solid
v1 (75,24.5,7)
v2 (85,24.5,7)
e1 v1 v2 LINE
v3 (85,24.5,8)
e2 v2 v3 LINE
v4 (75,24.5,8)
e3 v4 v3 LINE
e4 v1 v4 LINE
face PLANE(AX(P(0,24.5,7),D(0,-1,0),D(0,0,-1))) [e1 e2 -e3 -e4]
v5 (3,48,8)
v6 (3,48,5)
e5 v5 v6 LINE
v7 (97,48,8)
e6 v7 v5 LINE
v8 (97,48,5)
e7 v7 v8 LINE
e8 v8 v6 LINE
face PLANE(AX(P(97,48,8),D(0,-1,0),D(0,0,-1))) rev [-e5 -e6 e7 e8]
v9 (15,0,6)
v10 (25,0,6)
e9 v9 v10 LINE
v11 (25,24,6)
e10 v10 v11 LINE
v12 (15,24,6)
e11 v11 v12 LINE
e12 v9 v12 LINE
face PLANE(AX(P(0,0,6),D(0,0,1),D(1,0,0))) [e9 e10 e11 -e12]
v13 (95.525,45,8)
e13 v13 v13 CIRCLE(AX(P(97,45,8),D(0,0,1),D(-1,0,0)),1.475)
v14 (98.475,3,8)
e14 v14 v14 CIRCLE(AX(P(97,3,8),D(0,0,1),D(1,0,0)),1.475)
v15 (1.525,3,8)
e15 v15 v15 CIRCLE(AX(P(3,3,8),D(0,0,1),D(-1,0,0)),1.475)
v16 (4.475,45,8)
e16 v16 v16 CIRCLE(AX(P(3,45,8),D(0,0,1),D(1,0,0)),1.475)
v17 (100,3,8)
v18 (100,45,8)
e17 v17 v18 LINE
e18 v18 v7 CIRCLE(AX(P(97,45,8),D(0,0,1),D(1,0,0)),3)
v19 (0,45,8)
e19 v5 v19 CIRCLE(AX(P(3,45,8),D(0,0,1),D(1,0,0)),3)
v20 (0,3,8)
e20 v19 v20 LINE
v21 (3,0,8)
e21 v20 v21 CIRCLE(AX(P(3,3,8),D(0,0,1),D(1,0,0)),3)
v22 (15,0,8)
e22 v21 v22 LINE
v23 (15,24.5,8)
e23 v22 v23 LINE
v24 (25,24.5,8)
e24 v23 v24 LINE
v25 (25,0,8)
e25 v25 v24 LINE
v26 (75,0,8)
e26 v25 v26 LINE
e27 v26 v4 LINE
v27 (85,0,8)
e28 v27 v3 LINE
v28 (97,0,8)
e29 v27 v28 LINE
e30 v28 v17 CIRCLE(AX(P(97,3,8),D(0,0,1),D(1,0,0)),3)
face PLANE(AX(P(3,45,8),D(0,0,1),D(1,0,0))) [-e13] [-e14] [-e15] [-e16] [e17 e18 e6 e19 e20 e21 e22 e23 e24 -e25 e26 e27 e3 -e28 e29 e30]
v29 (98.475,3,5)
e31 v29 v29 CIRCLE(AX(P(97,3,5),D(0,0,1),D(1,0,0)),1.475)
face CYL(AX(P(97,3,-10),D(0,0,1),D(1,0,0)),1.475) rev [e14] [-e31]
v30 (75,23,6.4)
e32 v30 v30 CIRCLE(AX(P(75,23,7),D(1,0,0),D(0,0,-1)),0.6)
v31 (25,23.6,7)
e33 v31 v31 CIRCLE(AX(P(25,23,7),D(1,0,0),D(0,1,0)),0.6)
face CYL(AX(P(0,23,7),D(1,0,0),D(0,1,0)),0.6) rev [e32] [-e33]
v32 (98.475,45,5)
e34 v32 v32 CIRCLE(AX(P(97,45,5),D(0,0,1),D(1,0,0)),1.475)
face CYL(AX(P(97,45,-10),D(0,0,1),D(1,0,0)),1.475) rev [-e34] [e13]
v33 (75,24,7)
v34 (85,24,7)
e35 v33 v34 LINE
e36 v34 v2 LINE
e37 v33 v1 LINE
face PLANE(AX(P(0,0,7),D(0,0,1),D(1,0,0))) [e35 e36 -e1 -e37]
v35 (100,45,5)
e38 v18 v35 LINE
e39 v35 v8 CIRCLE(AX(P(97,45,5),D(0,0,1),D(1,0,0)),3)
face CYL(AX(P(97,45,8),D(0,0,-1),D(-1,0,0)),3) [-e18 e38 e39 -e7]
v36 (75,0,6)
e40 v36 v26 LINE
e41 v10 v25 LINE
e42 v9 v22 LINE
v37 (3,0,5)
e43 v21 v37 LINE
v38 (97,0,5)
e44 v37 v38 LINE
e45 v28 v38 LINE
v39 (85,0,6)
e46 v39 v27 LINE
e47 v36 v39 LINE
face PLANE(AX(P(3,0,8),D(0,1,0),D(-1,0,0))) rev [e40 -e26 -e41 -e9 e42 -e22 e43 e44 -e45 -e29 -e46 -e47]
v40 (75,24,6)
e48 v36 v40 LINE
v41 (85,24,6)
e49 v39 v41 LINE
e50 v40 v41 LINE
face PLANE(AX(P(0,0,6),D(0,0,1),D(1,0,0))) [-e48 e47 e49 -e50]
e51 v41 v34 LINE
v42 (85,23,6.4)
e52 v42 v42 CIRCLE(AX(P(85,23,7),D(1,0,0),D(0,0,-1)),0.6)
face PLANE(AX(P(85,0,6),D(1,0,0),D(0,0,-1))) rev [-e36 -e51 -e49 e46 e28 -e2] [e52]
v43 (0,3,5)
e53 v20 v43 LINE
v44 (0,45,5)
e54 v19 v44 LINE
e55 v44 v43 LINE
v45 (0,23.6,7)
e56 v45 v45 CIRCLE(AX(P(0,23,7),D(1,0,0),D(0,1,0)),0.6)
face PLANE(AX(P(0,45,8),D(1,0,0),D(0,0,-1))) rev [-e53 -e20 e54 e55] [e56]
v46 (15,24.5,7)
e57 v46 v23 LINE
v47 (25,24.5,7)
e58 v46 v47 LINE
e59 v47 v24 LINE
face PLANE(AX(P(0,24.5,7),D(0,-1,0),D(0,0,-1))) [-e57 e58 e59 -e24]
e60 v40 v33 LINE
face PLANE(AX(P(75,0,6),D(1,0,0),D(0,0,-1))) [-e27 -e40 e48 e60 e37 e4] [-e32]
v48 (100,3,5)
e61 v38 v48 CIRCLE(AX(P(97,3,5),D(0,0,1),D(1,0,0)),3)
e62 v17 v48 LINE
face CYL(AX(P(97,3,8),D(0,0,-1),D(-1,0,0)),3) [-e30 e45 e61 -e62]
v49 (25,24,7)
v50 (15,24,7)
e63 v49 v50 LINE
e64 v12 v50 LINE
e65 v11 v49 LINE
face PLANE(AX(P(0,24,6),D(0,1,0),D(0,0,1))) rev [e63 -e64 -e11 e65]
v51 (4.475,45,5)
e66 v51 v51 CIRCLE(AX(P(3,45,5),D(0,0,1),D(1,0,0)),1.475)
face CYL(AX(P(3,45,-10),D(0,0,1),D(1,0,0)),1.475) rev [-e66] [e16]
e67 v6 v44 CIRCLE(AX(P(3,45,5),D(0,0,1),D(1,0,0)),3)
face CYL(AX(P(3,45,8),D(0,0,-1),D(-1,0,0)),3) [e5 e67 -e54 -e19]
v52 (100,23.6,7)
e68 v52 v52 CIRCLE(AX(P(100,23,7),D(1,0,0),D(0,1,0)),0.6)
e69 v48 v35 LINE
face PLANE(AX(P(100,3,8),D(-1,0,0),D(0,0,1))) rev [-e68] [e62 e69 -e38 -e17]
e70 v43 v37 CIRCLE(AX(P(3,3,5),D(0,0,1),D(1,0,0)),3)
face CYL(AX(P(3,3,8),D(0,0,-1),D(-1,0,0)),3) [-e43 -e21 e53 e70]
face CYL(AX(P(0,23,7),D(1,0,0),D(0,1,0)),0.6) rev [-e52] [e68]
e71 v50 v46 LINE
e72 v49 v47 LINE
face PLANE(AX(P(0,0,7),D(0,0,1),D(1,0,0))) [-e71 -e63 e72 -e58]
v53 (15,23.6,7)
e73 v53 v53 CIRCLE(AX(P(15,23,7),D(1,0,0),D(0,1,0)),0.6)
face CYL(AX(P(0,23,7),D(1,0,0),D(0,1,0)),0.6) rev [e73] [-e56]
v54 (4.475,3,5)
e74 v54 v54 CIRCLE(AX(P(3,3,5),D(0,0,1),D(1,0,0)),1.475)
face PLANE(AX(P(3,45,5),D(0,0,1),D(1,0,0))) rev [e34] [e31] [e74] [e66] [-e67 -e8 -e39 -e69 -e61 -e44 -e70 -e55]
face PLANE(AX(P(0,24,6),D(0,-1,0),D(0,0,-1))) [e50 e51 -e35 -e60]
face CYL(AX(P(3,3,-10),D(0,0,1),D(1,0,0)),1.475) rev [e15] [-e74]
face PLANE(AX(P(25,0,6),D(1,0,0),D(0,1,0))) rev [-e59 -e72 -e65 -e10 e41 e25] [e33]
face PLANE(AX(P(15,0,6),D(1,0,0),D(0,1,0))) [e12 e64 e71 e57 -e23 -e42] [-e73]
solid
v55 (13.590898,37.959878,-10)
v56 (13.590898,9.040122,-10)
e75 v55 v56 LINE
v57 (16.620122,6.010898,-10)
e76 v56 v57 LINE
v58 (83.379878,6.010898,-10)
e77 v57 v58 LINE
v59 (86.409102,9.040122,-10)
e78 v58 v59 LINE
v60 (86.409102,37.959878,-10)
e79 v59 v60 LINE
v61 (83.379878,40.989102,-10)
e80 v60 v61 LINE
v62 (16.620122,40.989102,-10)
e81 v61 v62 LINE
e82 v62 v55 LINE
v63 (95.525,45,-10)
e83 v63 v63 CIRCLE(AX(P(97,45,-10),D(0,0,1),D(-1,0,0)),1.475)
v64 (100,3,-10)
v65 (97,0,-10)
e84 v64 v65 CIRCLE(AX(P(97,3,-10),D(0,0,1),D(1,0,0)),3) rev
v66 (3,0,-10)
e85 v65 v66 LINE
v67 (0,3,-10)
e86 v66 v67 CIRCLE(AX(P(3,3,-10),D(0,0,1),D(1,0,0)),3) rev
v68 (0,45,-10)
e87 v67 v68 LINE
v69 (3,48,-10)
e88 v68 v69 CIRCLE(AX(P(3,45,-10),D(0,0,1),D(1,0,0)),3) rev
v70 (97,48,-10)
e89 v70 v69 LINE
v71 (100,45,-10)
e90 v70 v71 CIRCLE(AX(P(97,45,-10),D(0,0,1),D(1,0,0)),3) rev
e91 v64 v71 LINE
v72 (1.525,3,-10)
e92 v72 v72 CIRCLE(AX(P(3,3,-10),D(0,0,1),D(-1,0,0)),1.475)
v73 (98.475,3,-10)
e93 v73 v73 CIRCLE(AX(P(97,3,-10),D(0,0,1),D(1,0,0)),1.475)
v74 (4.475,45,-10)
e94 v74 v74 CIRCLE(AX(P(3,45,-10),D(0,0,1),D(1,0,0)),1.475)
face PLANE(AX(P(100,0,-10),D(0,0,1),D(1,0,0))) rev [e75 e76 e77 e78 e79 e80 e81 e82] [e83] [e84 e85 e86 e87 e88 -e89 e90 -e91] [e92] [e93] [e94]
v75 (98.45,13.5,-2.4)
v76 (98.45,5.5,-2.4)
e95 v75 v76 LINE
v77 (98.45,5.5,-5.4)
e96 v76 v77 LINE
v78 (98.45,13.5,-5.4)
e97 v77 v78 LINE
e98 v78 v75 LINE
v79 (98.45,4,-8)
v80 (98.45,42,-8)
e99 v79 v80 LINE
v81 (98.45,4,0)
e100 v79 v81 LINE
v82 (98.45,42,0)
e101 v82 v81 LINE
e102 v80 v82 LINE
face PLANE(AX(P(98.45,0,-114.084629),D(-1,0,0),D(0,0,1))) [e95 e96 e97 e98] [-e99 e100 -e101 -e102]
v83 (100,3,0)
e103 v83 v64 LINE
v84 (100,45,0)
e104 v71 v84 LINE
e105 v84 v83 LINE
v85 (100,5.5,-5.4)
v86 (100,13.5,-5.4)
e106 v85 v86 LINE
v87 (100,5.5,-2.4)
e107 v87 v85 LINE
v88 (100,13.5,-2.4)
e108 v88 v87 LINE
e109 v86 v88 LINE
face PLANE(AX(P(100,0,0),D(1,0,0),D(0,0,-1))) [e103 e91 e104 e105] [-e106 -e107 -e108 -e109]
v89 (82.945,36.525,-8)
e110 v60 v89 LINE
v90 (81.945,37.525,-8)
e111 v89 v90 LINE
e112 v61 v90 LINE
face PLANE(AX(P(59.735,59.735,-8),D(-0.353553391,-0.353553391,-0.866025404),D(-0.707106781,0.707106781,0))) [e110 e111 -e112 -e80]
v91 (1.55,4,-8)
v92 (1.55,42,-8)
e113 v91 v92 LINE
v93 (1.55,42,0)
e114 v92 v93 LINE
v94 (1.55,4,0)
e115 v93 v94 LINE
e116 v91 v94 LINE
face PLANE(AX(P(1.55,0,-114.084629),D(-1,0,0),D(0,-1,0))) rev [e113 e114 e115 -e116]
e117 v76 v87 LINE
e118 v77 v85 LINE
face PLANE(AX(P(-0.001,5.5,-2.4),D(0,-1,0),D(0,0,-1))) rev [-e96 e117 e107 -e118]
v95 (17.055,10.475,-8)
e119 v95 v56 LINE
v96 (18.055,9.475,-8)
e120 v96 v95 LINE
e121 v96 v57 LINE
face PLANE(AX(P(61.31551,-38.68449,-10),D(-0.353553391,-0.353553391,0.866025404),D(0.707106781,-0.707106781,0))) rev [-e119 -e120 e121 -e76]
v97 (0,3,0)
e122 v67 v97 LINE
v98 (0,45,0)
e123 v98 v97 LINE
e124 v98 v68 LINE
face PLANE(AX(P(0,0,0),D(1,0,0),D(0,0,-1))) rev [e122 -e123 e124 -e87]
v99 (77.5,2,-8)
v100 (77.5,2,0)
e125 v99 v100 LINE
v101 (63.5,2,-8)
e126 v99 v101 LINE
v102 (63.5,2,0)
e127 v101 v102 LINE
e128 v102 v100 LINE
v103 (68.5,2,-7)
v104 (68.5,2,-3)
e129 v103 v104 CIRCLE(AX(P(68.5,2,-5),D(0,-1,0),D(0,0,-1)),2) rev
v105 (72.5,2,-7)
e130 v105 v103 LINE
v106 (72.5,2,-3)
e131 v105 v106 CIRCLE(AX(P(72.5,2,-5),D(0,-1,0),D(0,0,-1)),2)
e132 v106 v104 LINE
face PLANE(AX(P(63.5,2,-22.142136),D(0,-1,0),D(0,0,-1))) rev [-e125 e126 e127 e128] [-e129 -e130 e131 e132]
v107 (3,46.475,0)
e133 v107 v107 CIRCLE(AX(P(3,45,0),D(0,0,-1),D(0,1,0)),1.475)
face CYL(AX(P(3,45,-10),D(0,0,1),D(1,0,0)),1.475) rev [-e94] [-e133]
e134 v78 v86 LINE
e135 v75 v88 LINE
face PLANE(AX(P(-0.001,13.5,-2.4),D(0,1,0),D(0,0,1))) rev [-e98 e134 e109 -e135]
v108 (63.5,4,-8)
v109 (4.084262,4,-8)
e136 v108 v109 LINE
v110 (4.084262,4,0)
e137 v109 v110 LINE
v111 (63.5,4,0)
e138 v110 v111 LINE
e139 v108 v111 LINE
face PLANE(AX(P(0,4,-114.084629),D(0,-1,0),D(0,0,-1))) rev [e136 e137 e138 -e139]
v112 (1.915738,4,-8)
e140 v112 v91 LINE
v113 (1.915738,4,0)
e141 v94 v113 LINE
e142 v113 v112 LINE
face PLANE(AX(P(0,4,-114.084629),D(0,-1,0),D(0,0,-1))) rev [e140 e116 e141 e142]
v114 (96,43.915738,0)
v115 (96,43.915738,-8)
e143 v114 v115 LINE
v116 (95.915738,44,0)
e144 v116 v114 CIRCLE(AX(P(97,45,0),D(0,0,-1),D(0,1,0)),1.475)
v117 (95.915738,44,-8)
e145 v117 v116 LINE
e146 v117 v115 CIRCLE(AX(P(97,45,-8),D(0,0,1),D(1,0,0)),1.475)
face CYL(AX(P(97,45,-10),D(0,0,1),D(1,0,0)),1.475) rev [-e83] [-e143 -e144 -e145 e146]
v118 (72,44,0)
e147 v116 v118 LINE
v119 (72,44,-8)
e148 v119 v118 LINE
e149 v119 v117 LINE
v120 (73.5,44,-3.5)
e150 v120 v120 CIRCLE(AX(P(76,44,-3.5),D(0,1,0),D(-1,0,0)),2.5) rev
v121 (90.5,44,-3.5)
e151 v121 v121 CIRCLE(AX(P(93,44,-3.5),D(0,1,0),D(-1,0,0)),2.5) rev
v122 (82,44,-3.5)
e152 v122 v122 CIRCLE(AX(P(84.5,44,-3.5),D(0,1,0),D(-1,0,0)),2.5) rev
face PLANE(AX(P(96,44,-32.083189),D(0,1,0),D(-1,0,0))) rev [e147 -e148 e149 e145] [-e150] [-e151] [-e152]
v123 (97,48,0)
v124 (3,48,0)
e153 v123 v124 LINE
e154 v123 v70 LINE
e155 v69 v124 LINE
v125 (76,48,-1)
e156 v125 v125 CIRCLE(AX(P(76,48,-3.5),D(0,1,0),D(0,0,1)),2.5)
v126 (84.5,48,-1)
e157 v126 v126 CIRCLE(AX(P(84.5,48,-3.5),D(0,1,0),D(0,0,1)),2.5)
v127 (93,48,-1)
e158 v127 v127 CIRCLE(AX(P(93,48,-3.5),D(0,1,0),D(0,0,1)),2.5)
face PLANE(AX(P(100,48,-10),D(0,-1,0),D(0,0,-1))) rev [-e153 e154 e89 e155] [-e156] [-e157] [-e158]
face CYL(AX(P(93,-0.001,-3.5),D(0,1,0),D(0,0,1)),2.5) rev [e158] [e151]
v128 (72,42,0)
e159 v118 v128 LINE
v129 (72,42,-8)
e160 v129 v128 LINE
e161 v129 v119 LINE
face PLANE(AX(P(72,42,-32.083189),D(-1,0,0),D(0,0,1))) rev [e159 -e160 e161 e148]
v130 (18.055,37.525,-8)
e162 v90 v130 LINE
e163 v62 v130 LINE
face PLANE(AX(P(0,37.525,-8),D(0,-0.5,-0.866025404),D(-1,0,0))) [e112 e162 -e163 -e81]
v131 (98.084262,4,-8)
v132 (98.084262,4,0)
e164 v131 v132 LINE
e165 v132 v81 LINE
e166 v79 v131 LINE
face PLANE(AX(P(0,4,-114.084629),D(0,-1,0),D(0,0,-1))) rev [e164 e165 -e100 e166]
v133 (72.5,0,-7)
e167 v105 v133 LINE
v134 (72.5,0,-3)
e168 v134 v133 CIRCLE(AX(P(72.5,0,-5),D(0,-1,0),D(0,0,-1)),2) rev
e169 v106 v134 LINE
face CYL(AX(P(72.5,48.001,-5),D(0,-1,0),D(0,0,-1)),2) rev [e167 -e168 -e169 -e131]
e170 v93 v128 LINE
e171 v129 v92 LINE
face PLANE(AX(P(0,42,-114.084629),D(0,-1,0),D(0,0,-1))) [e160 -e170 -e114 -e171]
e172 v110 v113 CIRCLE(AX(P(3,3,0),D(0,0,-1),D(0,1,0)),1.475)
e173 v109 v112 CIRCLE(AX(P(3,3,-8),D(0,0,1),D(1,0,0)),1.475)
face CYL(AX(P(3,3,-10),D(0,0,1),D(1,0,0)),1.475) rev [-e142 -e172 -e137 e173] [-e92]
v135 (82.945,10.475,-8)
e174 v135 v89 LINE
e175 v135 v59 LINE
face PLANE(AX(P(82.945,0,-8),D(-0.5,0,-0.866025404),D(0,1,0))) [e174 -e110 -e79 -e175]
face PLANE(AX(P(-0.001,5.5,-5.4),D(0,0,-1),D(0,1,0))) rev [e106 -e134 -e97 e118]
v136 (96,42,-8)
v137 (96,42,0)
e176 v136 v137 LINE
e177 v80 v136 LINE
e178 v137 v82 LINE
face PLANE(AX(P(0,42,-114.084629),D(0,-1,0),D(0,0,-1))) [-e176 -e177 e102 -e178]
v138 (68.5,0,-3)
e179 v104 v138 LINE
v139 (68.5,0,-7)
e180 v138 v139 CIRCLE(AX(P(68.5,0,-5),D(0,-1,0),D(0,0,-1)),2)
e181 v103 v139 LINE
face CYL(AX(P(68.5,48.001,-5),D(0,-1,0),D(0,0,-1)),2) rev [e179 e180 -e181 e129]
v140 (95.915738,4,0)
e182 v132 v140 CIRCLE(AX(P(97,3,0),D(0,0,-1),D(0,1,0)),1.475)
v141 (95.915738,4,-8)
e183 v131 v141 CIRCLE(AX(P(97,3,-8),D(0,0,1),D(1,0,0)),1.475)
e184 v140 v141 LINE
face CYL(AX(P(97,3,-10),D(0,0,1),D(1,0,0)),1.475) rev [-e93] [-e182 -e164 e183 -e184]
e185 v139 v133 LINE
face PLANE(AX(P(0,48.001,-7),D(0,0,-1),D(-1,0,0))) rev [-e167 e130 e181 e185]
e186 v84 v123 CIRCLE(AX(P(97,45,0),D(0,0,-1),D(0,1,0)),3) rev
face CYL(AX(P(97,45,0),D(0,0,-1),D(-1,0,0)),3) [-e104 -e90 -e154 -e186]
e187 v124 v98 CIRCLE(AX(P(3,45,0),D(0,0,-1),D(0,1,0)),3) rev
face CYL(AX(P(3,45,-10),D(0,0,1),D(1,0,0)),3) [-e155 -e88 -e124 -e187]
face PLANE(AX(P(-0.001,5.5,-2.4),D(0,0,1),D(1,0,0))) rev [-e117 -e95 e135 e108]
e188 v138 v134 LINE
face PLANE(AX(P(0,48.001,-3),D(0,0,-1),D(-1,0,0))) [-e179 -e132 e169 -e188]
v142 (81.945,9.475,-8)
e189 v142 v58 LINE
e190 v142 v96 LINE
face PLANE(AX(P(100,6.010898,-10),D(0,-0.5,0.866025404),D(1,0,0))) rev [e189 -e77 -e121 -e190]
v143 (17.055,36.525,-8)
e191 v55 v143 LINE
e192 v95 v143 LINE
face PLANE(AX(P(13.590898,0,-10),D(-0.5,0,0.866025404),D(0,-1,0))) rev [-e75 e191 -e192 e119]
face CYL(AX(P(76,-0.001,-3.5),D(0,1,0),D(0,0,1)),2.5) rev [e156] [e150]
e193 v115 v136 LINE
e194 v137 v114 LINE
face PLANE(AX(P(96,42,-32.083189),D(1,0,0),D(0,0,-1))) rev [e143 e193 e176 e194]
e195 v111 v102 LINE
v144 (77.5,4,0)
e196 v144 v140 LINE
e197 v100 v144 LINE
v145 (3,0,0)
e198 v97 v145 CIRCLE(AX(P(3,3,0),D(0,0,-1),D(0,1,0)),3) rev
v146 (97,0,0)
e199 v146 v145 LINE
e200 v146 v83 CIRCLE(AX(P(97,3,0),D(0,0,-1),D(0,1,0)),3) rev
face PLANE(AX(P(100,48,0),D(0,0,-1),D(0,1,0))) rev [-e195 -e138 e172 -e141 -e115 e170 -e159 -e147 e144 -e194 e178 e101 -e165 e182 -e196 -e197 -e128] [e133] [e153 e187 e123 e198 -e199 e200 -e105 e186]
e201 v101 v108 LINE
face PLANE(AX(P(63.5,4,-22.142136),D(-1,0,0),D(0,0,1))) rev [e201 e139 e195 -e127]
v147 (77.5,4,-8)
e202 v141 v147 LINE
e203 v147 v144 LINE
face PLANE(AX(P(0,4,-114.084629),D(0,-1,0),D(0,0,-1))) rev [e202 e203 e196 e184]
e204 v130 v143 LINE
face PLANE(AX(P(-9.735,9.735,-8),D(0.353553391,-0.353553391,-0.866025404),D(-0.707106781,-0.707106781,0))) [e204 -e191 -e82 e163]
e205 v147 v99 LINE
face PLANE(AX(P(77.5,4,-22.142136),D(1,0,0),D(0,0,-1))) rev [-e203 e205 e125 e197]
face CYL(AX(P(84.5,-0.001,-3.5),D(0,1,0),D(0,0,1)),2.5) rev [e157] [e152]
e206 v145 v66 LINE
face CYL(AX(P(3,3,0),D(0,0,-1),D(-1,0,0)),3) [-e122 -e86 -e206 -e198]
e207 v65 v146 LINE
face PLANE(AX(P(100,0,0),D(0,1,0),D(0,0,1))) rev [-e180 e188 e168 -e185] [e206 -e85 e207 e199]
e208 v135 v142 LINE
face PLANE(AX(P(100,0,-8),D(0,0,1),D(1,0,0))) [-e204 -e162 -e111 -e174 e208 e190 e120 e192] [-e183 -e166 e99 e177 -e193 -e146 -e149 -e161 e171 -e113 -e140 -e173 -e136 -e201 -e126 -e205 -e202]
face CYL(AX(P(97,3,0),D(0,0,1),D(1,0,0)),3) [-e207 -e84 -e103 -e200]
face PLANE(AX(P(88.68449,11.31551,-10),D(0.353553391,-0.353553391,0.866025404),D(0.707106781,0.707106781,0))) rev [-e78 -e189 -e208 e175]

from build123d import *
from OCP.BRepFilletAPI import BRepFilletAPI_MakeChamfer

# Parameters (mm, degrees)
SKETCH_1_W                = 10
SKETCH_1_H                = 48
EXTRUDE_2_DEPTH           = 100
CUT_EXTRUDE_3_DEPTH       = 112.373246339
SKETCH_4_3_W              = 96.9
SKETCH_4_3_H              = 38
CUT_EXTRUDE_4_DEPTH       = 8
CHAMFER_4_SIZE            = 3.464101615
CHAMFER_4_SIZE_2          = 2
FILLET_1_R                = 3
SKETCH_13_W               = 24
SKETCH_13_H               = 2
CUT_EXTRUDE_17_DEPTH      = 8
CUT_EXTRUDE_18_REACH      = 113.373
SKETCH_12_R               = 2.5
CUT_EXTRUDE_19_REACH      = 113.373
SKETCH_14_W               = 3
SKETCH_14_H               = 8
CUT_EXTRUDE_20_REACH      = 113.373
SKETCH_15_W               = 4
SKETCH_15_H               = 4
CUT_EXTRUDE_START         = -8
SKETCH_16_W               = 14
SKETCH_16_H               = 2
CUT_EXTRUDE_21_DEPTH      = 8
EXTRUDE_START             = 5
EXTRUDE_3_DEPTH           = 3
SKETCH_8_W                = 10
SKETCH_8_H                = 24
CUT_EXTRUDE_9_DEPTH       = 2
CUT_EXTRUDE_10_DEPTH      = 90.604687377
CUT_EXTRUDE_10_DEPTH_BACK = 90.604687377
SKETCH_9_R                = 0.6
SKETCH_10_R               = 1.475
CUT_EXTRUDE_12_DEPTH      = 113.374374303
SKETCH_8_4_W              = 10
SKETCH_8_4_H              = 0.5
CUT_EXTRUDE_16_DEPTH      = 1


with BuildPart() as part:
    # 草图1 → 凸台-拉伸2 (new body)
    with BuildSketch(Plane(origin=(0, 0, 0), x_dir=(0, 0, -1), z_dir=(1, 0, 0))):
        with Locations((5, 24)):
            Rectangle(SKETCH_1_W, SKETCH_1_H)
    extrude(amount=EXTRUDE_2_DEPTH)

    # 草图4 → 切除-拉伸3 (cut, through all)
    with BuildSketch(Plane.XY):
        Polygon((81.945, 37.525), (82.945, 36.525), (82.945, 10.475), (81.945, 9.475), (18.055, 9.475), (17.055, 10.475), (17.055, 36.525), (18.055, 37.525), align=None)
    extrude(amount=-CUT_EXTRUDE_3_DEPTH, mode=Mode.SUBTRACT)

    # 草图4<3> → 切除-拉伸4 (cut)
    with BuildSketch(Plane.XY):
        with Locations((50, 23)):
            Rectangle(SKETCH_4_3_W, SKETCH_4_3_H)
    extrude(amount=-CUT_EXTRUDE_4_DEPTH, mode=Mode.SUBTRACT)

    # 倒角4
    chamfer_4_edges_1 = [part.edges().sort_by_distance(p)[0] for p in [
        (17.055, 23.5, -10),
    ]]
    chamfer_4_side_1 = [part.faces().sort_by_distance(p)[0] for p in [
        (17.015, 23.5, -10),
    ]]
    chamfer_4_edges_2 = [part.edges().sort_by_distance(p)[0] for p in [
        (17.555, 37.025, -10),
    ]]
    chamfer_4_side_2 = [part.faces().sort_by_distance(p)[0] for p in [
        (17.526715729, 37.053284271, -10),
    ]]
    chamfer_4_edges_3 = [part.edges().sort_by_distance(p)[0] for p in [
        (50, 37.525, -10),
    ]]
    chamfer_4_side_3 = [part.faces().sort_by_distance(p)[0] for p in [
        (50, 37.565, -10),
    ]]
    chamfer_4_edges_4 = [part.edges().sort_by_distance(p)[0] for p in [
        (82.445, 37.025, -10),
    ]]
    chamfer_4_side_4 = [part.faces().sort_by_distance(p)[0] for p in [
        (82.473284271, 37.053284271, -10),
    ]]
    chamfer_4_edges_5 = [part.edges().sort_by_distance(p)[0] for p in [
        (82.945, 23.5, -10),
    ]]
    chamfer_4_side_5 = [part.faces().sort_by_distance(p)[0] for p in [
        (82.985, 23.5, -10),
    ]]
    chamfer_4_edges_6 = [part.edges().sort_by_distance(p)[0] for p in [
        (82.445, 9.975, -10),
    ]]
    chamfer_4_side_6 = [part.faces().sort_by_distance(p)[0] for p in [
        (82.473284271, 9.946715729, -10),
    ]]
    chamfer_4_edges_7 = [part.edges().sort_by_distance(p)[0] for p in [
        (50, 9.475, -10),
    ]]
    chamfer_4_side_7 = [part.faces().sort_by_distance(p)[0] for p in [
        (50, 9.435, -10),
    ]]
    chamfer_4_edges_8 = [part.edges().sort_by_distance(p)[0] for p in [
        (17.555, 9.975, -10),
    ]]
    chamfer_4_side_8 = [part.faces().sort_by_distance(p)[0] for p in [
        (17.526715729, 9.946715729, -10),
    ]]
    chamfer_4 = BRepFilletAPI_MakeChamfer(part.part.solid().wrapped)
    for e in chamfer_4_edges_1:
        chamfer_4.Add(CHAMFER_4_SIZE - 0.0001, CHAMFER_4_SIZE_2 - 0.0001, e.wrapped, chamfer_4_side_1[0].wrapped)
    for e in chamfer_4_edges_2:
        chamfer_4.Add(CHAMFER_4_SIZE - 0.0001, CHAMFER_4_SIZE_2 - 0.0001, e.wrapped, chamfer_4_side_2[0].wrapped)
    for e in chamfer_4_edges_3:
        chamfer_4.Add(CHAMFER_4_SIZE - 0.0001, CHAMFER_4_SIZE_2 - 0.0001, e.wrapped, chamfer_4_side_3[0].wrapped)
    for e in chamfer_4_edges_4:
        chamfer_4.Add(CHAMFER_4_SIZE - 0.0001, CHAMFER_4_SIZE_2 - 0.0001, e.wrapped, chamfer_4_side_4[0].wrapped)
    for e in chamfer_4_edges_5:
        chamfer_4.Add(CHAMFER_4_SIZE - 0.0001, CHAMFER_4_SIZE_2 - 0.0001, e.wrapped, chamfer_4_side_5[0].wrapped)
    for e in chamfer_4_edges_6:
        chamfer_4.Add(CHAMFER_4_SIZE - 0.0001, CHAMFER_4_SIZE_2 - 0.0001, e.wrapped, chamfer_4_side_6[0].wrapped)
    for e in chamfer_4_edges_7:
        chamfer_4.Add(CHAMFER_4_SIZE - 0.0001, CHAMFER_4_SIZE_2 - 0.0001, e.wrapped, chamfer_4_side_7[0].wrapped)
    for e in chamfer_4_edges_8:
        chamfer_4.Add(CHAMFER_4_SIZE - 0.0001, CHAMFER_4_SIZE_2 - 0.0001, e.wrapped, chamfer_4_side_8[0].wrapped)
    add(Compound.cast(chamfer_4.Shape()), mode=Mode.REPLACE)  # a hair under: the kernel refuses the full size

    # 圆角1
    fillet_1_edges = [part.edges().sort_by_distance(p)[0] for p in [
        (100, 0, -5),
        (100, 48, -5),
        (0, 0, -5),
        (0, 48, -5),
    ]]
    fillet(fillet_1_edges, radius=FILLET_1_R)

    # 草图13 → 切除-拉伸17 (cut)
    with BuildSketch(Plane.XY):
        with Locations((84, 43)):
            Rectangle(SKETCH_13_W, SKETCH_13_H)
    extrude(amount=-CUT_EXTRUDE_17_DEPTH, mode=Mode.SUBTRACT)

    # 草图12 → 切除-拉伸18 (cut, up to next)
    with BuildSketch(Plane(origin=(0, 48, 0), x_dir=(1, 0, 0), z_dir=(0, 1, 0)), mode=Mode.PRIVATE) as cut_extrude_18_sk1:
        with Locations(Location((76, 3.5, 0), (0, 0, 270))):
            Circle(SKETCH_12_R)
    cut_extrude_18_tool1 = extrude(cut_extrude_18_sk1.sketch, amount=-CUT_EXTRUDE_18_REACH, mode=Mode.PRIVATE) & part.part
    # 草图12 → 切除-拉伸18 (cut, up to next)
    with BuildSketch(Plane(origin=(0, 48, 0), x_dir=(1, 0, 0), z_dir=(0, 1, 0)), mode=Mode.PRIVATE) as cut_extrude_18_sk2:
        with Locations(Location((93, 3.5, 0), (0, 0, 270))):
            Circle(SKETCH_12_R)
    cut_extrude_18_tool2 = extrude(cut_extrude_18_sk2.sketch, amount=-CUT_EXTRUDE_18_REACH, mode=Mode.PRIVATE) & part.part
    # 草图12 → 切除-拉伸18 (cut, up to next)
    with BuildSketch(Plane(origin=(0, 48, 0), x_dir=(1, 0, 0), z_dir=(0, 1, 0)), mode=Mode.PRIVATE) as cut_extrude_18_sk3:
        with Locations(Location((84.5, 3.5, 0), (0, 0, 270))):
            Circle(SKETCH_12_R)
    cut_extrude_18_tool3 = extrude(cut_extrude_18_sk3.sketch, amount=-CUT_EXTRUDE_18_REACH, mode=Mode.PRIVATE) & part.part
    add(cut_extrude_18_tool1.solids().sort_by_distance((76, 48, -3.5))[0], mode=Mode.SUBTRACT)
    add(cut_extrude_18_tool2.solids().sort_by_distance((93, 48, -3.5))[0], mode=Mode.SUBTRACT)
    add(cut_extrude_18_tool3.solids().sort_by_distance((84.5, 48, -3.5))[0], mode=Mode.SUBTRACT)

    # 草图14 → 切除-拉伸19 (cut, up to next)
    with BuildSketch(Plane(origin=(100, 0, 0), x_dir=(0, 0, -1), z_dir=(1, 0, 0)), mode=Mode.PRIVATE) as cut_extrude_19_sk1:
        with Locations((3.9, 9.5)):
            Rectangle(SKETCH_14_W, SKETCH_14_H)
    cut_extrude_19_tool1 = extrude(cut_extrude_19_sk1.sketch, amount=-CUT_EXTRUDE_19_REACH, mode=Mode.PRIVATE) & part.part
    add(cut_extrude_19_tool1.solids().sort_by_distance((100, 9.5, -3.9))[0], mode=Mode.SUBTRACT)

    # 草图15 → 切除-拉伸20 (cut, up to next)
    with BuildSketch(Plane.XZ, mode=Mode.PRIVATE) as cut_extrude_20_sk1:
        with Locations((70.5, -5)):
            Rectangle(SKETCH_15_W, SKETCH_15_H)
    cut_extrude_20_tool1 = extrude(cut_extrude_20_sk1.sketch, amount=-CUT_EXTRUDE_20_REACH, mode=Mode.PRIVATE) & part.part
    # 草图15 → 切除-拉伸20 (cut, up to next)
    with BuildSketch(Plane.XZ, mode=Mode.PRIVATE) as cut_extrude_20_sk2:
        with BuildLine():
            ThreePointArc((72.5, -3), (74.5, -5), (72.5, -7))
            Line((72.5, -7), (72.5, -3))
        make_face()
    cut_extrude_20_tool2 = extrude(cut_extrude_20_sk2.sketch, amount=-CUT_EXTRUDE_20_REACH, mode=Mode.PRIVATE) & part.part
    # 草图15 → 切除-拉伸20 (cut, up to next)
    with BuildSketch(Plane.XZ, mode=Mode.PRIVATE) as cut_extrude_20_sk3:
        with BuildLine():
            Line((68.5, -7), (68.5, -3))
            ThreePointArc((68.5, -3), (66.5, -5), (68.5, -7))
        make_face()
    cut_extrude_20_tool3 = extrude(cut_extrude_20_sk3.sketch, amount=-CUT_EXTRUDE_20_REACH, mode=Mode.PRIVATE) & part.part
    add(cut_extrude_20_tool1.solids().sort_by_distance((70.5, 0, -5))[0], mode=Mode.SUBTRACT)
    add(cut_extrude_20_tool2.solids().sort_by_distance((73.348826, 0, -5))[0], mode=Mode.SUBTRACT)
    add(cut_extrude_20_tool3.solids().sort_by_distance((67.651174, 0, -5))[0], mode=Mode.SUBTRACT)

    # 草图16 → 切除-拉伸21 (cut)
    with BuildSketch(Plane.XY.offset(CUT_EXTRUDE_START)):
        with Locations((70.5, 3)):
            Rectangle(SKETCH_16_W, SKETCH_16_H)
    extrude(amount=CUT_EXTRUDE_21_DEPTH, mode=Mode.SUBTRACT)


with BuildPart() as body_2:
    # 草图7 → 凸台-拉伸3 (new body)
    with BuildSketch(Plane.XY.offset(EXTRUDE_START)):
        with BuildLine():
            Line((3, 0), (97, 0))
            ThreePointArc((97, 0), (99.121320344, 0.878679656), (100, 3))
            Line((100, 3), (100, 45))
            ThreePointArc((100, 45), (99.121320344, 47.121320344), (97, 48))
            Line((97, 48), (3, 48))
            ThreePointArc((3, 48), (0.878679656, 47.121320344), (0, 45))
            Line((0, 45), (0, 3))
            ThreePointArc((0, 3), (0.878679656, 0.878679656), (3, 0))
        make_face()
    extrude(amount=EXTRUDE_3_DEPTH)

    # 草图8 → 切除-拉伸9 (cut)
    with BuildSketch(Plane.XY.offset(8)):
        with Locations((20, 12)):
            Rectangle(SKETCH_8_W, SKETCH_8_H)
        with Locations((80, 12)):
            Rectangle(SKETCH_8_W, SKETCH_8_H)
    extrude(amount=-CUT_EXTRUDE_9_DEPTH, mode=Mode.SUBTRACT)

    # 草图9 → 切除-拉伸10 (cut, two sides: drawn at the far end of the back side and taken through both)
    with BuildSketch(Plane(origin=(75, 0, 0), x_dir=(0, 0, -1), z_dir=(1, 0, 0)).offset(-CUT_EXTRUDE_10_DEPTH_BACK)):
        with Locations(Location((-7, 23, 0), (0, 0, 90))):
            Circle(SKETCH_9_R)
    extrude(amount=CUT_EXTRUDE_10_DEPTH + CUT_EXTRUDE_10_DEPTH_BACK, mode=Mode.SUBTRACT)


with BuildPart() as cut_extrude_12_tool:
    # 草图10 → 切除-拉伸12 (new, through all)
    with BuildSketch(Plane.XY.offset(8)):
        with Locations((3, 45)):
            Circle(SKETCH_10_R)
        with Locations((97, 45)):
            Circle(SKETCH_10_R)
        with Locations((97, 3)):
            Circle(SKETCH_10_R)
        with Locations((3, 3)):
            Circle(SKETCH_10_R)
    extrude(amount=-CUT_EXTRUDE_12_DEPTH)


with BuildPart() as part_1:
    add(part.part)

    # 切除-拉伸12: cut by cut_extrude_12_tool
    add(cut_extrude_12_tool.part, mode=Mode.SUBTRACT)


with BuildPart() as body_2_1:
    add(body_2.part)

    # 切除-拉伸12: cut by cut_extrude_12_tool
    add(cut_extrude_12_tool.part, mode=Mode.SUBTRACT)

    # 草图8<4> → 切除-拉伸16 (cut)
    with BuildSketch(Plane.XY.offset(8)):
        with Locations((20, 24.25)):
            Rectangle(SKETCH_8_4_W, SKETCH_8_4_H)
        with Locations((80, 24.25)):
            Rectangle(SKETCH_8_4_W, SKETCH_8_4_H)
    extrude(amount=-CUT_EXTRUDE_16_DEPTH, mode=Mode.SUBTRACT)


solid = Compound([part_1.part, body_2_1.part])
